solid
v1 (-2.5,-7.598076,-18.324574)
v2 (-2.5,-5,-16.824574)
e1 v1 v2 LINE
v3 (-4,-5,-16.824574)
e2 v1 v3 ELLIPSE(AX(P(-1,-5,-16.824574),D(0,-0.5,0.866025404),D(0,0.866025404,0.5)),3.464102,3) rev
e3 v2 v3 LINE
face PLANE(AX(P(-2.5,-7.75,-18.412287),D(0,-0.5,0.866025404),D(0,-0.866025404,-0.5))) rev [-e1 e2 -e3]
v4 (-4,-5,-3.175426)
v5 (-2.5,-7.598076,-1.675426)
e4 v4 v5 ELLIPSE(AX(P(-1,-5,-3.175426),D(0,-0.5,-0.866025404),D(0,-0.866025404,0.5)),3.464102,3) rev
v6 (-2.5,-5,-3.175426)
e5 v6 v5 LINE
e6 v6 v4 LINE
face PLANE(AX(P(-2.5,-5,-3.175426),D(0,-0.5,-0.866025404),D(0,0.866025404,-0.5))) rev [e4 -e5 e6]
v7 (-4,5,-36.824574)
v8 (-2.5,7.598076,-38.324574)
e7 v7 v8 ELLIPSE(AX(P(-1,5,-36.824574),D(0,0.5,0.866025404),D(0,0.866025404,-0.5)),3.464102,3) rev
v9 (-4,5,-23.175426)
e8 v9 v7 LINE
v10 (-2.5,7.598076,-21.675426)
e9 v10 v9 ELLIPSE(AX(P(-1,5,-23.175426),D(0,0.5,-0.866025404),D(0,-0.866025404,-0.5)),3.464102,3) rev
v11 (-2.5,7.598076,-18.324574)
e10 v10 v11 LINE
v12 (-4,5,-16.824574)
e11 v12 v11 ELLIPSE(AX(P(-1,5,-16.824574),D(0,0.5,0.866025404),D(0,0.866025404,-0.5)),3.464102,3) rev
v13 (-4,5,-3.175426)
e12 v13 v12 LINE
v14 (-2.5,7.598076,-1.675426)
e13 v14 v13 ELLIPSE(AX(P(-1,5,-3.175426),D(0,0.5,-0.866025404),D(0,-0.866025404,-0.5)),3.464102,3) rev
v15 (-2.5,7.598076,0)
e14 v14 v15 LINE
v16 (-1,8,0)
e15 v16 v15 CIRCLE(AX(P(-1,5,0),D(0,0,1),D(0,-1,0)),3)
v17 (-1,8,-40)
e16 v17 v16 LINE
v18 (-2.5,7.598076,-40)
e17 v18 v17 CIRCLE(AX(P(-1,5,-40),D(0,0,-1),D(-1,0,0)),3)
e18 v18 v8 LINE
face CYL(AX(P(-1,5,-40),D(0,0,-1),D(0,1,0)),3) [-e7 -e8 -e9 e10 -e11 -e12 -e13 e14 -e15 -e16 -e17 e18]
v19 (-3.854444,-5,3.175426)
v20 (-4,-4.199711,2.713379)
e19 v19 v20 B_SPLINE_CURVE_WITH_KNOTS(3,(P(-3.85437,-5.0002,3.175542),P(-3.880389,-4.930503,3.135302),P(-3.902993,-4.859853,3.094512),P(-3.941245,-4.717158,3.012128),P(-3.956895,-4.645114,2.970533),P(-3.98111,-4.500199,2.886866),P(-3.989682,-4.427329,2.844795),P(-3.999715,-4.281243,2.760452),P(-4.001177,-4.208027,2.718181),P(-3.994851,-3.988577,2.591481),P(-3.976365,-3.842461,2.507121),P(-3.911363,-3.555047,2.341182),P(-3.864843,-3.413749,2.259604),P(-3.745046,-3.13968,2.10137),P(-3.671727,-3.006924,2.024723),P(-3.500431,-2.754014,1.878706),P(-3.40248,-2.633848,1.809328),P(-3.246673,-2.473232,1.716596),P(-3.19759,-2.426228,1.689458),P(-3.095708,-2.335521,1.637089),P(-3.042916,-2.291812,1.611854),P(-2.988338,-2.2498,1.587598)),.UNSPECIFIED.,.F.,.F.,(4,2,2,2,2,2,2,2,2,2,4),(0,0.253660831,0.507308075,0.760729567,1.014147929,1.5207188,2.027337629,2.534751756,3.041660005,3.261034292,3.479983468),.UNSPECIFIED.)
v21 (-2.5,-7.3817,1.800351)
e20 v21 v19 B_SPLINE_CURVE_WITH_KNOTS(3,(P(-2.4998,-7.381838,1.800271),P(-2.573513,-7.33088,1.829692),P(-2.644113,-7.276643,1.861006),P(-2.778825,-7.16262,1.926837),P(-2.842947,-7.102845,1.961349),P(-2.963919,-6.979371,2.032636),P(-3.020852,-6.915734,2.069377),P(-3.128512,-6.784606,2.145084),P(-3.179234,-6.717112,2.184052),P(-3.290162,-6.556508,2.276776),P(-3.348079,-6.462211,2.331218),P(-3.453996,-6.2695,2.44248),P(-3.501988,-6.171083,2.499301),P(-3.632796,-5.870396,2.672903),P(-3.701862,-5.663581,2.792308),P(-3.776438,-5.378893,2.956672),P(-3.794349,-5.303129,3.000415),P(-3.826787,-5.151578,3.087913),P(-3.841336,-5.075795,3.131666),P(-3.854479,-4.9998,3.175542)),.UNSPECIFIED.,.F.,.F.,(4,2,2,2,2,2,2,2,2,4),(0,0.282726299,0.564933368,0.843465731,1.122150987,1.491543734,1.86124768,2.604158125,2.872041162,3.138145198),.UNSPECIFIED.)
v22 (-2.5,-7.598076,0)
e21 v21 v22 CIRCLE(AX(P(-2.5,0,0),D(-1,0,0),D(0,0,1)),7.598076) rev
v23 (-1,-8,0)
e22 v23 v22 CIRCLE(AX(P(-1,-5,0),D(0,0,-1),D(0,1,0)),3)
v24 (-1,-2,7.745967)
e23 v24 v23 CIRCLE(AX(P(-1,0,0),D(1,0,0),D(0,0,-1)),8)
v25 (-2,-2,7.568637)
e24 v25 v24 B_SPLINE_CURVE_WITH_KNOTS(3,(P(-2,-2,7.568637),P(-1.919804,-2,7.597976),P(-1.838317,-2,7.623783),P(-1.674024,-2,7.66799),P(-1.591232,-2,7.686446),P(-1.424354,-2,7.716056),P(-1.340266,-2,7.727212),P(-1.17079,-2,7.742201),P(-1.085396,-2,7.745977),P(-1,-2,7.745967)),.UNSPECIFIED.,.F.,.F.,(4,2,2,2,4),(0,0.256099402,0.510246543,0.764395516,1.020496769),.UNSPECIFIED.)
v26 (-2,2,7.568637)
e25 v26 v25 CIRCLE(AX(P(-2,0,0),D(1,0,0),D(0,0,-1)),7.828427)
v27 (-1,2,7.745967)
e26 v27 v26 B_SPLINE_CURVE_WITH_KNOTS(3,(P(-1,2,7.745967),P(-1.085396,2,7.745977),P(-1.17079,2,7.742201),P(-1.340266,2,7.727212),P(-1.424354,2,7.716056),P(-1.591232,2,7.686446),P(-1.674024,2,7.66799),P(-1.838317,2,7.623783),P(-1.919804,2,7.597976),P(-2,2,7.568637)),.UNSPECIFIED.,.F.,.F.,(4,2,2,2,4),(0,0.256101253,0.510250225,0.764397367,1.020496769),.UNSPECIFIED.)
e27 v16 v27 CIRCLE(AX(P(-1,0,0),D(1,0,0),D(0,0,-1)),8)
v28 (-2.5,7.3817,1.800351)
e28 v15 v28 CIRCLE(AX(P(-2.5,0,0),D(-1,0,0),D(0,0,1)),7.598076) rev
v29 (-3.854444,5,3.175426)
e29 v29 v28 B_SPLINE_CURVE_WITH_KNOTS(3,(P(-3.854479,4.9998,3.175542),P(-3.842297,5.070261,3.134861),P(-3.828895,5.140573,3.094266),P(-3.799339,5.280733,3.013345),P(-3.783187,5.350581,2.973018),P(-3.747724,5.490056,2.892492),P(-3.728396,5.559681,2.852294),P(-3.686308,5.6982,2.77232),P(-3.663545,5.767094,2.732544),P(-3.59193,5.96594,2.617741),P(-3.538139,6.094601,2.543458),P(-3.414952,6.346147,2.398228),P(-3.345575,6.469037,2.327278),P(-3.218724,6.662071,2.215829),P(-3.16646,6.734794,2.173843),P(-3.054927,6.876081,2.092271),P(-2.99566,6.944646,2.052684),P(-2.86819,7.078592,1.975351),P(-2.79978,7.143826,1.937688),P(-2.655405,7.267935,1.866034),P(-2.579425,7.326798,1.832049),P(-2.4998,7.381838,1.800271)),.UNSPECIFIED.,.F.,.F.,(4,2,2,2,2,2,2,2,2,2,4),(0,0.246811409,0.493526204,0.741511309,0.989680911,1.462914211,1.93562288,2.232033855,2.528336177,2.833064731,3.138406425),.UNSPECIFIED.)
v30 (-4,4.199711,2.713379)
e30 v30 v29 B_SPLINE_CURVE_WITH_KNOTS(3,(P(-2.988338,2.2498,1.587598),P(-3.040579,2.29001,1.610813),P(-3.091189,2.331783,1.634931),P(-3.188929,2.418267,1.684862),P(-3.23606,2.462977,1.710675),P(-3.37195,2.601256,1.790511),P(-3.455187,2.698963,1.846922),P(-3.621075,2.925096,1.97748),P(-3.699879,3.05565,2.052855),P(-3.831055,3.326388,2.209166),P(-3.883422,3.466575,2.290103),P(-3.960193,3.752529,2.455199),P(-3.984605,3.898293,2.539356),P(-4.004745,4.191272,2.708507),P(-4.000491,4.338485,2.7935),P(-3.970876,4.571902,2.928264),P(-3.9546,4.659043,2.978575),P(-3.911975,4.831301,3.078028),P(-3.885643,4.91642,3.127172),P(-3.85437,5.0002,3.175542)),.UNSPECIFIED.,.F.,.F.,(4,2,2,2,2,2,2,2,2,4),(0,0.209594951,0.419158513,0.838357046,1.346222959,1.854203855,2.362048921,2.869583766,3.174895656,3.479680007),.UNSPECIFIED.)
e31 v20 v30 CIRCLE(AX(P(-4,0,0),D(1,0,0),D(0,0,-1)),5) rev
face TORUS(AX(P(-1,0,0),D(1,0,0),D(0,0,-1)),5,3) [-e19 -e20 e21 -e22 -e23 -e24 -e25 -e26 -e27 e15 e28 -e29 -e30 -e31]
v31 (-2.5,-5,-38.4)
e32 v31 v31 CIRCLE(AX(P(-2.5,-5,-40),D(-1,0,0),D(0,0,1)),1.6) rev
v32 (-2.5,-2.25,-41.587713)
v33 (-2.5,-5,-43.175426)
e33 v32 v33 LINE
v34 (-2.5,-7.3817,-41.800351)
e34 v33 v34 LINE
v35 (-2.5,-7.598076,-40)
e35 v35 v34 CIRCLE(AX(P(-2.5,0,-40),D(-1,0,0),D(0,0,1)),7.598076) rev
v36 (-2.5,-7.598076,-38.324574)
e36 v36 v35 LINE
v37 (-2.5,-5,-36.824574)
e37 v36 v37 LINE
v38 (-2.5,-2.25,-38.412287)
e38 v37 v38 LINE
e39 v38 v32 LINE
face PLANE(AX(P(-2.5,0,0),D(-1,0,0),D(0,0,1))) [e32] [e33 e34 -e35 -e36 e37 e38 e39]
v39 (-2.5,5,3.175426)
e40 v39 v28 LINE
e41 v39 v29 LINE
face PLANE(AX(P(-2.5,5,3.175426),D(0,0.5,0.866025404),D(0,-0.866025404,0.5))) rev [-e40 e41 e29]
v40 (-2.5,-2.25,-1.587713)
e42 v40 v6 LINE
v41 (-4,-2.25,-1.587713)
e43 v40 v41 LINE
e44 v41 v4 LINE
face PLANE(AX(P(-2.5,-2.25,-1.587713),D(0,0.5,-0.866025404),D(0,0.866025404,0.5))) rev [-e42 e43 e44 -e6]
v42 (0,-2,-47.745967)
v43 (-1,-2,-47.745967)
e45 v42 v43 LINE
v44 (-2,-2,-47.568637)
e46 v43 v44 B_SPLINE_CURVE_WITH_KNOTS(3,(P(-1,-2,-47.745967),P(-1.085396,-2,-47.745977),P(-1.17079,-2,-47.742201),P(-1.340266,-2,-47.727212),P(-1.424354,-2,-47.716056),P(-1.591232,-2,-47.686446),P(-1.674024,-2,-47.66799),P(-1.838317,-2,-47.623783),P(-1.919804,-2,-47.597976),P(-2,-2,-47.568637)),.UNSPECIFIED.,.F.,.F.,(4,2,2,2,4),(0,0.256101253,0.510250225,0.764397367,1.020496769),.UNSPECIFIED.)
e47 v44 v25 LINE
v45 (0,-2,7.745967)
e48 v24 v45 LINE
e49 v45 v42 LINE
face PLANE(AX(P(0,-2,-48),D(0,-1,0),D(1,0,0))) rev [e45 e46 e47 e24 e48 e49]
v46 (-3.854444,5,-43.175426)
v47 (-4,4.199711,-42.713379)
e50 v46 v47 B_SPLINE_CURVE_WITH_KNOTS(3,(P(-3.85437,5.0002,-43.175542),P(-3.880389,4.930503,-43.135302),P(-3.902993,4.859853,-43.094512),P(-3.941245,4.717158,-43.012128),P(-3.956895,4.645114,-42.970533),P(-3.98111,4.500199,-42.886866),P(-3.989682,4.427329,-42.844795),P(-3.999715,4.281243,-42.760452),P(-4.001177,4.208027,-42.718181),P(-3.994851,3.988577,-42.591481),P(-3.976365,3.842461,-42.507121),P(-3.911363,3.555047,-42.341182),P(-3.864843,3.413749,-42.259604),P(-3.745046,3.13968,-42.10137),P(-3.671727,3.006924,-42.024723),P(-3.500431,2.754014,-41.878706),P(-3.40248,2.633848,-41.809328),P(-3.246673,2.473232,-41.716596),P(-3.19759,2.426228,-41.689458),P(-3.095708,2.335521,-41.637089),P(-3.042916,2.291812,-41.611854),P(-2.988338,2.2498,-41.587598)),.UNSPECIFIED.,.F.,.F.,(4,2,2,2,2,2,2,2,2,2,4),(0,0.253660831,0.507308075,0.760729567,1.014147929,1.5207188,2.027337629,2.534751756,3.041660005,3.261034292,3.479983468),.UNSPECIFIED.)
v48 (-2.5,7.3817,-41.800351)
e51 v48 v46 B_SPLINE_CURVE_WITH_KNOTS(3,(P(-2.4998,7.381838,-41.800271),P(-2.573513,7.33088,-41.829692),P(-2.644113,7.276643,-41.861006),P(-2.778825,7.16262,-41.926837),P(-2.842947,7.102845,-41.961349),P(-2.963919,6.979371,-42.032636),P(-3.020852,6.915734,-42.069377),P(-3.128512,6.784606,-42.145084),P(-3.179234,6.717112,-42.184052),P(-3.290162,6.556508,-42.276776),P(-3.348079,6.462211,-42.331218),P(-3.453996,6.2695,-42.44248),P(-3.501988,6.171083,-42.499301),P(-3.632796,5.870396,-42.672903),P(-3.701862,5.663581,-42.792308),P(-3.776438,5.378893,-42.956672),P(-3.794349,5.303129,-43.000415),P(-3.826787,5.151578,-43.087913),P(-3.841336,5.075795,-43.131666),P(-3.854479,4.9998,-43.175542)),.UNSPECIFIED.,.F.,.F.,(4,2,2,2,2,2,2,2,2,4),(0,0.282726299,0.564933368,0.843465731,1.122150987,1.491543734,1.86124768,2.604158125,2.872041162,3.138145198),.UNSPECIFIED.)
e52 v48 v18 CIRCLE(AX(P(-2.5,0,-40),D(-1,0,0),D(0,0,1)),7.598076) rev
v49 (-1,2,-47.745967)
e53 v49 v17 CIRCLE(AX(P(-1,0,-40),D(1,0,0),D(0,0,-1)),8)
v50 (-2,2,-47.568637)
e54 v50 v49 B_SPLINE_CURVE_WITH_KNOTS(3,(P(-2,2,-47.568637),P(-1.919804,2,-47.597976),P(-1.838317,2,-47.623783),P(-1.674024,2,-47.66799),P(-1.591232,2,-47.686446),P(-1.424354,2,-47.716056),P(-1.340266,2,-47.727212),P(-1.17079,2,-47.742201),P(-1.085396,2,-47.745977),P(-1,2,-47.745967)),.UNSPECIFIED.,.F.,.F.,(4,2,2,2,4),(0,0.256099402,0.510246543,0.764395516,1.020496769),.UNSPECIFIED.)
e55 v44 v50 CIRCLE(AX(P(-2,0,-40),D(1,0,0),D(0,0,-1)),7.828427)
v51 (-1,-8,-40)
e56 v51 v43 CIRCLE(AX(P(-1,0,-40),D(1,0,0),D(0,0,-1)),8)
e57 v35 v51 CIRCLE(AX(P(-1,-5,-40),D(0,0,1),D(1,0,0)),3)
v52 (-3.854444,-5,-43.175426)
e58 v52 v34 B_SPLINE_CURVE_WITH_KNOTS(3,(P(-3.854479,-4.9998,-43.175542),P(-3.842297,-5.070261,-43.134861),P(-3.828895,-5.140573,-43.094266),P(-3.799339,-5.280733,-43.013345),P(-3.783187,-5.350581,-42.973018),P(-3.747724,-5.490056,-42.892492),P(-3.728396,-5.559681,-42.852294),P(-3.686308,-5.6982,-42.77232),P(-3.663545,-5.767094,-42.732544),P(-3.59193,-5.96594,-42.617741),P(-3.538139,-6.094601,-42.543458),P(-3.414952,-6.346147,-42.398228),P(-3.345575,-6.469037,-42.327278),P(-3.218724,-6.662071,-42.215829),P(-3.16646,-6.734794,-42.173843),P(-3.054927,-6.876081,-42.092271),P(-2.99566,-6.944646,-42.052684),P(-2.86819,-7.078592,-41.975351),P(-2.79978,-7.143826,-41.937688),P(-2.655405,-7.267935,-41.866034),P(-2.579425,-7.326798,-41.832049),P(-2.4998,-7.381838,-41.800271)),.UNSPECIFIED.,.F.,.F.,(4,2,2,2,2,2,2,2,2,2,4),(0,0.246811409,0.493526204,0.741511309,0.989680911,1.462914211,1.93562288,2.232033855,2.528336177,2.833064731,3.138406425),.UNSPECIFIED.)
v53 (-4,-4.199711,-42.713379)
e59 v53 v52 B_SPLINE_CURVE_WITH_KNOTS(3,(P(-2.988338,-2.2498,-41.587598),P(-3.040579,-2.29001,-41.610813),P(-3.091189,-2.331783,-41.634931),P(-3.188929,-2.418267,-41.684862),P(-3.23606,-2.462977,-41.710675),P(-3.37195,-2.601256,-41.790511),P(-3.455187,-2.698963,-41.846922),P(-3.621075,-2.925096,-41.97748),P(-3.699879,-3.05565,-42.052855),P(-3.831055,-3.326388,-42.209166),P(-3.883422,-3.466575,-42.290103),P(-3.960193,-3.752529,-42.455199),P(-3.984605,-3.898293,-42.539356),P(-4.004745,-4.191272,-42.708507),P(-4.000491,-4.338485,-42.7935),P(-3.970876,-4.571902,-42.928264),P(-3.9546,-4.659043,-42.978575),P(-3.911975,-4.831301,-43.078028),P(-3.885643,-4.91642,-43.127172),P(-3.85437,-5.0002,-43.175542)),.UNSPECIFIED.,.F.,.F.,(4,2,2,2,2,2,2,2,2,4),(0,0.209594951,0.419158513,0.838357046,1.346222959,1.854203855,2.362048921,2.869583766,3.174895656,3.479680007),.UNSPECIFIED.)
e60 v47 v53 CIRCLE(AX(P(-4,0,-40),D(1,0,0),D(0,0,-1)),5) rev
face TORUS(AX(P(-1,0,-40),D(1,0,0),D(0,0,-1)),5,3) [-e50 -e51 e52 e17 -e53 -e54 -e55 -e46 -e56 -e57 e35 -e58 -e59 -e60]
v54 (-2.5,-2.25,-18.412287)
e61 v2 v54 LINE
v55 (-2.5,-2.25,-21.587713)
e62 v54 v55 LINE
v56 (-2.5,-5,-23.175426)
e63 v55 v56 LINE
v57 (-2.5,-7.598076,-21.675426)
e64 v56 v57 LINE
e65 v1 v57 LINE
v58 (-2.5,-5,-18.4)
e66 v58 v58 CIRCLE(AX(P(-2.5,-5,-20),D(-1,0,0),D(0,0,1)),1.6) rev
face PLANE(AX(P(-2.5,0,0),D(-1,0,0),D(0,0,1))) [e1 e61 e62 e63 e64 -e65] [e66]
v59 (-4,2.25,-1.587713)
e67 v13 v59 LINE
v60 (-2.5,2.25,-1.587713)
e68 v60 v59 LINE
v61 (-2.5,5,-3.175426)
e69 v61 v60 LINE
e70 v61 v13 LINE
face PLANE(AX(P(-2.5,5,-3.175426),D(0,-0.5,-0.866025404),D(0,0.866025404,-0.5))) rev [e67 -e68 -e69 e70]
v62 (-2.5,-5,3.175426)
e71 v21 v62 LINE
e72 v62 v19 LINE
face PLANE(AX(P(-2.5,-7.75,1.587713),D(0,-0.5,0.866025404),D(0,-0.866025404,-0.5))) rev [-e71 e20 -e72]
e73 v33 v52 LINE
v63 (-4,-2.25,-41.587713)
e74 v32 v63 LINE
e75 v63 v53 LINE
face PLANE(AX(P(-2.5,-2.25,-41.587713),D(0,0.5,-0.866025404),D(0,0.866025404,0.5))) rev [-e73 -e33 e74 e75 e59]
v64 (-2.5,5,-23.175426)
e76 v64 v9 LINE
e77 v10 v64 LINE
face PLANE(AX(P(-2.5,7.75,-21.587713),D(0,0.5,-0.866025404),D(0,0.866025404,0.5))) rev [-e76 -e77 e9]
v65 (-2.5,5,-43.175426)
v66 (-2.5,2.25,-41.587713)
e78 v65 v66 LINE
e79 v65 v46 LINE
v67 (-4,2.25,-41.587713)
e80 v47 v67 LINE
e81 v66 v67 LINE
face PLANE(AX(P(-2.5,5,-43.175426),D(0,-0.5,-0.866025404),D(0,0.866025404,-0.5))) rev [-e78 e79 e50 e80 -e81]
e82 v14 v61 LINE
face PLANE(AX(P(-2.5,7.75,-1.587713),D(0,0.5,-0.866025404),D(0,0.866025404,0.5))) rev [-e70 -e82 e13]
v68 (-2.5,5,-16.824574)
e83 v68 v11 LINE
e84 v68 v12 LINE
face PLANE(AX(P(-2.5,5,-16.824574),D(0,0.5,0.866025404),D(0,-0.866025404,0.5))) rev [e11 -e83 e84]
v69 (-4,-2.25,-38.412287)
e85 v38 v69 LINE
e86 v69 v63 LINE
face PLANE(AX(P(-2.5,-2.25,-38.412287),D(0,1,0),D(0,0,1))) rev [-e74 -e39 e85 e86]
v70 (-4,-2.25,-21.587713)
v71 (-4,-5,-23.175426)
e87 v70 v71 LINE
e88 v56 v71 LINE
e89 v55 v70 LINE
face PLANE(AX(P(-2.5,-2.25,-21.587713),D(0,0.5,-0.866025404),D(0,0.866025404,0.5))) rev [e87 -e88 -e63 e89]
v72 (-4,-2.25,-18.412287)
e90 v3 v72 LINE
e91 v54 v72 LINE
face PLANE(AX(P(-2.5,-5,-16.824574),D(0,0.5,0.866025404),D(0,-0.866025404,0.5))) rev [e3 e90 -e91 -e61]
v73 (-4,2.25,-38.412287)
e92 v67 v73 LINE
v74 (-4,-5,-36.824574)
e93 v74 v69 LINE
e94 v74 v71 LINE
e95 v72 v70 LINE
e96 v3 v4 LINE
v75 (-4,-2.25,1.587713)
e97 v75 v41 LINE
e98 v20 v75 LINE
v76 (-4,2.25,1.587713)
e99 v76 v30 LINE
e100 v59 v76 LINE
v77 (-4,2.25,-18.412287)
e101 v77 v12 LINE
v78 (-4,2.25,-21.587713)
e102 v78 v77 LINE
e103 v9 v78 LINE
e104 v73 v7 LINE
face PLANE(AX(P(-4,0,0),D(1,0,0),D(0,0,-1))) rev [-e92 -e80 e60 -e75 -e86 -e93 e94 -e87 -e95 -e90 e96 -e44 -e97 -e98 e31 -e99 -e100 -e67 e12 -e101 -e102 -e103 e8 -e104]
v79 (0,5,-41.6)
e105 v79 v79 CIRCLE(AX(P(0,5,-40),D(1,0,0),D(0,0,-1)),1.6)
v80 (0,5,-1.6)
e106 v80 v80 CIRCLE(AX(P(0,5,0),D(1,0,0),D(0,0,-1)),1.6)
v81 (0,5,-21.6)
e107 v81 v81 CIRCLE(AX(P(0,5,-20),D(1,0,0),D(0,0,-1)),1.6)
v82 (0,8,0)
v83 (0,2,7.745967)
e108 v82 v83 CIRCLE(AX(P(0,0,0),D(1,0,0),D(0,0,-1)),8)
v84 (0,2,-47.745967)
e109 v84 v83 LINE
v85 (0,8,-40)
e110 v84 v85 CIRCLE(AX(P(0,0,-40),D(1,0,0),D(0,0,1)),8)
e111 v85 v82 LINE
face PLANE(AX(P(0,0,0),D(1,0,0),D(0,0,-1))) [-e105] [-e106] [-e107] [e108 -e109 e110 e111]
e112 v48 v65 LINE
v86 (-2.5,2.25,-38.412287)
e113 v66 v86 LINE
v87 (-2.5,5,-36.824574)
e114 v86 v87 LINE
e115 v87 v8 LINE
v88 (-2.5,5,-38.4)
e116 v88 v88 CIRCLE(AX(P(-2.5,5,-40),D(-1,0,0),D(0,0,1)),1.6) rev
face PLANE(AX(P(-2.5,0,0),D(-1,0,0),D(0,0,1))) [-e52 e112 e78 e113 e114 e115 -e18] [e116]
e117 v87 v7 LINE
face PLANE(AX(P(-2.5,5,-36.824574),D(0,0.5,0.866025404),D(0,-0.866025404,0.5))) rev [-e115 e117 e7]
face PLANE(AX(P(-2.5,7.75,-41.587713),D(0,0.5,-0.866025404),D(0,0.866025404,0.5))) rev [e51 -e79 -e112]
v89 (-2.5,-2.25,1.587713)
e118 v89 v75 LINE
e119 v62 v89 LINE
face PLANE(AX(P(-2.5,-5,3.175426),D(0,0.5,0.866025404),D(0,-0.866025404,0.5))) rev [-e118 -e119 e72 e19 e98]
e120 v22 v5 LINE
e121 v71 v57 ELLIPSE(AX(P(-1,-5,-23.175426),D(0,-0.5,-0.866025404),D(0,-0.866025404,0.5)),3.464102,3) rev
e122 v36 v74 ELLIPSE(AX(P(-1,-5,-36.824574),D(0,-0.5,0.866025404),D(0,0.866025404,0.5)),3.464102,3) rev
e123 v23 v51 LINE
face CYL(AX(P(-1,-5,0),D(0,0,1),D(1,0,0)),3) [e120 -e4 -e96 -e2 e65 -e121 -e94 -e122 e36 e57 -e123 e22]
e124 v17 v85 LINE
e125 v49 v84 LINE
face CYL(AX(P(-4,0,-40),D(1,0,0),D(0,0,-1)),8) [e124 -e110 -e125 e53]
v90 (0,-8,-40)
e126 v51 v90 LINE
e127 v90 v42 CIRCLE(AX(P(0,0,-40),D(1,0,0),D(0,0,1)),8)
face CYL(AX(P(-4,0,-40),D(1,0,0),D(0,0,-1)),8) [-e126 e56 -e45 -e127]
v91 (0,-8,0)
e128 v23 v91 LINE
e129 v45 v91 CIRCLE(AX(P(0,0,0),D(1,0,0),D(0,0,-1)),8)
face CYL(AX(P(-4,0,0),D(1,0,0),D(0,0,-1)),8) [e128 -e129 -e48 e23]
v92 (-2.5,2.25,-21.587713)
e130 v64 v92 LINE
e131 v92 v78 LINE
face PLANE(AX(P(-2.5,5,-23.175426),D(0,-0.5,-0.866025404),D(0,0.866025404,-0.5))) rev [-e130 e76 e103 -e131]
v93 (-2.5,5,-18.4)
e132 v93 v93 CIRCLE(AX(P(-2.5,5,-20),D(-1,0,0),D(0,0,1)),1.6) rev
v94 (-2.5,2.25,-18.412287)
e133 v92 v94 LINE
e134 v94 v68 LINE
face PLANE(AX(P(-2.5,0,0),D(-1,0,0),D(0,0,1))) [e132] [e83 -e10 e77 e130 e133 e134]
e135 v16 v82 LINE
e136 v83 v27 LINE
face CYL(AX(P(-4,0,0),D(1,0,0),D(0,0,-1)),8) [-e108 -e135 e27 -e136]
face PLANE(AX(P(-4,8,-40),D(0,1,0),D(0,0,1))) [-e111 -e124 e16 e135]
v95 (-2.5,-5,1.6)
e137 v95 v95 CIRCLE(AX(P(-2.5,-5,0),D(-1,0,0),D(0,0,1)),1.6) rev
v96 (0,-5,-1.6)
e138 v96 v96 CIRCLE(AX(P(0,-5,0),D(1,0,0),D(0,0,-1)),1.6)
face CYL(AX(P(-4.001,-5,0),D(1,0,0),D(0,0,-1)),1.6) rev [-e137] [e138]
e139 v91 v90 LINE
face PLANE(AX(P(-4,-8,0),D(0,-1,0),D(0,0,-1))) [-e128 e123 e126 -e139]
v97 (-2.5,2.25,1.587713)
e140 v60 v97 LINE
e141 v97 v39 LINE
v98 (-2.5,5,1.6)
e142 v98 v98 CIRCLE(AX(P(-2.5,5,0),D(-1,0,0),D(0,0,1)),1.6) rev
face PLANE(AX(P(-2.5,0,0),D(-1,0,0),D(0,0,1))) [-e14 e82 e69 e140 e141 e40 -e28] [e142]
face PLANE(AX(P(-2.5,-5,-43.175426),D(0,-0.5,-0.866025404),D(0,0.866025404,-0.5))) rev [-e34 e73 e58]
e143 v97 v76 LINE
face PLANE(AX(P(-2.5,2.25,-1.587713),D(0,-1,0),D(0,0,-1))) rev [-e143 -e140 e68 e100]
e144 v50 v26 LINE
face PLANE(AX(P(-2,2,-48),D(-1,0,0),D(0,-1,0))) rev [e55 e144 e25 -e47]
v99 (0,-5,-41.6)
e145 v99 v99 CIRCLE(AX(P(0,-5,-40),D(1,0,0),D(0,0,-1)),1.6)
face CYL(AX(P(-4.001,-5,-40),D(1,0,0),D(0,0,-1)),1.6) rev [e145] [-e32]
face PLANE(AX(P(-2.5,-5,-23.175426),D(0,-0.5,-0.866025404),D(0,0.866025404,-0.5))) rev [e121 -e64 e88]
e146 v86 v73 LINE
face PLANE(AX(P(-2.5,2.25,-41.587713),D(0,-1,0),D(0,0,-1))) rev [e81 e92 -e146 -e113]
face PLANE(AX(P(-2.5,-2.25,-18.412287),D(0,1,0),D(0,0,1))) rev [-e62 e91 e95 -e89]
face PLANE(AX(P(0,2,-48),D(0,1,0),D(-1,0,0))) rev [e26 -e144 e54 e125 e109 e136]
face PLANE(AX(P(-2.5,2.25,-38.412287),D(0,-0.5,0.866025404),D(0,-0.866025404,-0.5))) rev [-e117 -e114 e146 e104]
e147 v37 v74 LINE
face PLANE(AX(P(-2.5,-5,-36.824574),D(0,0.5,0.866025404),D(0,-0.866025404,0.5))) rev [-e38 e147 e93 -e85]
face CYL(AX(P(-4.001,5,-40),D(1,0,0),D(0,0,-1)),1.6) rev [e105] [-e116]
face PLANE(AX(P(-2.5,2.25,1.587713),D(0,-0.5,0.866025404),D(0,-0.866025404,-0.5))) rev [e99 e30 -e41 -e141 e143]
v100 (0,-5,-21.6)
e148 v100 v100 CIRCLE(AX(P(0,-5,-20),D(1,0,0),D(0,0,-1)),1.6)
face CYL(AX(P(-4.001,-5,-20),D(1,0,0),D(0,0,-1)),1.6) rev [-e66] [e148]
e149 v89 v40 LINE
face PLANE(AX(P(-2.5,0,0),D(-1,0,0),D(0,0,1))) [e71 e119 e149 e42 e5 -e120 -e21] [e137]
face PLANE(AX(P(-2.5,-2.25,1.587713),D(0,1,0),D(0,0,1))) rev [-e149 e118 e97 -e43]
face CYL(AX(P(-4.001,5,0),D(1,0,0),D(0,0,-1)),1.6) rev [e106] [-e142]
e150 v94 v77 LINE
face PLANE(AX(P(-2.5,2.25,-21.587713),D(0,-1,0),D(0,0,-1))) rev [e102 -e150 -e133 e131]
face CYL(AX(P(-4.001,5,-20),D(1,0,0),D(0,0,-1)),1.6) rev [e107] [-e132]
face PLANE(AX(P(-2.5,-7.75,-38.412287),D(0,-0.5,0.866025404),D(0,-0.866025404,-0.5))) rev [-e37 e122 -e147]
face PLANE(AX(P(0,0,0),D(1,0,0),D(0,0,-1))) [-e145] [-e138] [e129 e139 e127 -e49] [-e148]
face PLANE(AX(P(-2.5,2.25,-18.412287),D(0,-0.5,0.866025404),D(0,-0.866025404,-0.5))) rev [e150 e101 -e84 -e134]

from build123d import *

# Parameters (mm, degrees)
BOSS_EXTRUDE1_DEPTH     = 4
CUT_EXTRUDE1_DEPTH      = 49.826222463
CUT_EXTRUDE1_DEPTH_BACK = 49.826222463
SKETCH2_W               = 2
SKETCH2_H               = 4
CUT_EXTRUDE2_REACH      = 50.826
SKETCH3_R               = 1.6
FILLET1_R               = 3
CUT_EXTRUDE3_DEPTH      = 1.5


with BuildPart() as part:
    # Sketch1 → Boss-Extrude1 (new body)
    with BuildSketch(Plane(origin=(0, 0, 0), x_dir=(0, 0, -1), z_dir=(1, 0, 0))):
        with BuildLine():
            Line((0, -8), (40, -8))
            ThreePointArc((40, -8), (48, 0), (40, 8))
            Line((40, 8), (0, 8))
            ThreePointArc((0, 8), (-8, 0), (0, -8))
        make_face()
    extrude(amount=-BOSS_EXTRUDE1_DEPTH)

    # Sketch2 → Cut-Extrude1 (cut, two sides: drawn at the far end of the back side and taken through both)
    with BuildSketch(Plane.XY.offset(-CUT_EXTRUDE1_DEPTH_BACK)):
        with Locations((-1, 0)):
            Rectangle(SKETCH2_W, SKETCH2_H)
    extrude(amount=CUT_EXTRUDE1_DEPTH + CUT_EXTRUDE1_DEPTH_BACK, mode=Mode.SUBTRACT)

    # Sketch3 → Cut-Extrude2 (cut, up to next)
    with BuildSketch(Plane(origin=(0, 0, 0), x_dir=(0, 0, -1), z_dir=(1, 0, 0)), mode=Mode.PRIVATE) as cut_extrude2_sk1:
        with Locations((0, 5)):
            Circle(SKETCH3_R)
    cut_extrude2_tool1 = extrude(cut_extrude2_sk1.sketch, amount=-CUT_EXTRUDE2_REACH, mode=Mode.PRIVATE) & part.part
    # Sketch3 → Cut-Extrude2 (cut, up to next)
    with BuildSketch(Plane(origin=(0, 0, 0), x_dir=(0, 0, -1), z_dir=(1, 0, 0)), mode=Mode.PRIVATE) as cut_extrude2_sk2:
        with Locations((40, 5)):
            Circle(SKETCH3_R)
    cut_extrude2_tool2 = extrude(cut_extrude2_sk2.sketch, amount=-CUT_EXTRUDE2_REACH, mode=Mode.PRIVATE) & part.part
    # Sketch3 → Cut-Extrude2 (cut, up to next)
    with BuildSketch(Plane(origin=(0, 0, 0), x_dir=(0, 0, -1), z_dir=(1, 0, 0)), mode=Mode.PRIVATE) as cut_extrude2_sk3:
        with Locations((40, -5)):
            Circle(SKETCH3_R)
    cut_extrude2_tool3 = extrude(cut_extrude2_sk3.sketch, amount=-CUT_EXTRUDE2_REACH, mode=Mode.PRIVATE) & part.part
    # Sketch3 → Cut-Extrude2 (cut, up to next)
    with BuildSketch(Plane(origin=(0, 0, 0), x_dir=(0, 0, -1), z_dir=(1, 0, 0)), mode=Mode.PRIVATE) as cut_extrude2_sk4:
        with Locations((0, -5)):
            Circle(SKETCH3_R)
    cut_extrude2_tool4 = extrude(cut_extrude2_sk4.sketch, amount=-CUT_EXTRUDE2_REACH, mode=Mode.PRIVATE) & part.part
    # Sketch3 → Cut-Extrude2 (cut, up to next)
    with BuildSketch(Plane(origin=(0, 0, 0), x_dir=(0, 0, -1), z_dir=(1, 0, 0)), mode=Mode.PRIVATE) as cut_extrude2_sk5:
        with Locations((20, 5)):
            Circle(SKETCH3_R)
    cut_extrude2_tool5 = extrude(cut_extrude2_sk5.sketch, amount=-CUT_EXTRUDE2_REACH, mode=Mode.PRIVATE) & part.part
    # Sketch3 → Cut-Extrude2 (cut, up to next)
    with BuildSketch(Plane(origin=(0, 0, 0), x_dir=(0, 0, -1), z_dir=(1, 0, 0)), mode=Mode.PRIVATE) as cut_extrude2_sk6:
        with Locations((20, -5)):
            Circle(SKETCH3_R)
    cut_extrude2_tool6 = extrude(cut_extrude2_sk6.sketch, amount=-CUT_EXTRUDE2_REACH, mode=Mode.PRIVATE) & part.part
    add(cut_extrude2_tool1.solids().sort_by_distance((0, 5, 0))[0], mode=Mode.SUBTRACT)
    add(cut_extrude2_tool2.solids().sort_by_distance((0, 5, -40))[0], mode=Mode.SUBTRACT)
    add(cut_extrude2_tool3.solids().sort_by_distance((0, -5, -40))[0], mode=Mode.SUBTRACT)
    add(cut_extrude2_tool4.solids().sort_by_distance((0, -5, 0))[0], mode=Mode.SUBTRACT)
    add(cut_extrude2_tool5.solids().sort_by_distance((0, 5, -20))[0], mode=Mode.SUBTRACT)
    add(cut_extrude2_tool6.solids().sort_by_distance((0, -5, -20))[0], mode=Mode.SUBTRACT)

    # Fillet1
    # the kernel refuses this fillet: 3 mm, written as the material it takes off along each edge
    with BuildSketch(Plane(origin=(-4, -8, 0), x_dir=(0, 1, 0), z_dir=(0, 0, -1))) as fillet1_piece_1:
        with BuildLine():
            CenterArc((FILLET1_R, FILLET1_R), FILLET1_R, 180, 90)
            Line((0, FILLET1_R), (0, 0))
            Line((0, 0), (FILLET1_R, 0))
        make_face()
    extrude(amount=40, mode=Mode.SUBTRACT)
    with BuildSketch(Plane(origin=(-4, 0, 0), x_dir=(0, 1, 0), z_dir=(0, 0, -1))) as fillet1_piece_2:
        with BuildLine():
            CenterArc((8 - FILLET1_R, FILLET1_R), FILLET1_R, 270, 90)
            Line((8 - FILLET1_R, 0), (8, 0))
            Line((8, 0), (8, FILLET1_R))
        make_face()
    revolve(axis=Axis((-4, 0, 0), (1, 0, 0)), revolution_arc=180, mode=Mode.SUBTRACT)
    with BuildSketch(Plane(origin=(-4, 8, -40), x_dir=(1, 0, 0), z_dir=(0, 0, 1))) as fillet1_piece_3:
        with BuildLine():
            CenterArc((FILLET1_R, -FILLET1_R), FILLET1_R, 90, 90)
            Line((0, -FILLET1_R), (0, 0))
            Line((0, 0), (FILLET1_R, 0))
        make_face()
    extrude(amount=40, mode=Mode.SUBTRACT)
    with BuildSketch(Plane(origin=(-4, 0, -40), x_dir=(0, -1, 0), z_dir=(0, 0, 1))) as fillet1_piece_4:
        with BuildLine():
            CenterArc((8 - FILLET1_R, FILLET1_R), FILLET1_R, 270, 90)
            Line((8 - FILLET1_R, 0), (8, 0))
            Line((8, 0), (8, FILLET1_R))
        make_face()
    revolve(axis=Axis((-4, 0, -40), (1, 0, 0)), revolution_arc=180, mode=Mode.SUBTRACT)

    # Sketch4 → Cut-Extrude3 (cut)
    with BuildSketch(Plane.ZY.offset(4)):
        Polygon((-36.824573519, 5), (-38.41228676, 7.75), (-41.58771324, 7.75), (-43.175426481, 5), (-41.58771324, 2.25), (-38.41228676, 2.25), align=None)
        Polygon((-3.175426481, 5), (-1.58771324, 2.25), (1.58771324, 2.25), (3.175426481, 5), (1.58771324, 7.75), (-1.58771324, 7.75), align=None)
        Polygon((-3.175426481, -5), (-1.58771324, -7.75), (1.58771324, -7.75), (3.175426481, -5), (1.58771324, -2.25), (-1.58771324, -2.25), align=None)
        Polygon((-36.824573519, -5), (-38.41228676, -2.25), (-41.58771324, -2.25), (-43.175426481, -5), (-41.58771324, -7.75), (-38.41228676, -7.75), align=None)
        Polygon((-16.824573519, 5), (-18.41228676, 7.75), (-21.58771324, 7.75), (-23.175426481, 5), (-21.58771324, 2.25), (-18.41228676, 2.25), align=None)
        Polygon((-16.824573519, -5), (-18.41228676, -2.25), (-21.58771324, -2.25), (-23.175426481, -5), (-21.58771324, -7.75), (-18.41228676, -7.75), align=None)
    extrude(amount=-CUT_EXTRUDE3_DEPTH, mode=Mode.SUBTRACT)


solid = part.part
